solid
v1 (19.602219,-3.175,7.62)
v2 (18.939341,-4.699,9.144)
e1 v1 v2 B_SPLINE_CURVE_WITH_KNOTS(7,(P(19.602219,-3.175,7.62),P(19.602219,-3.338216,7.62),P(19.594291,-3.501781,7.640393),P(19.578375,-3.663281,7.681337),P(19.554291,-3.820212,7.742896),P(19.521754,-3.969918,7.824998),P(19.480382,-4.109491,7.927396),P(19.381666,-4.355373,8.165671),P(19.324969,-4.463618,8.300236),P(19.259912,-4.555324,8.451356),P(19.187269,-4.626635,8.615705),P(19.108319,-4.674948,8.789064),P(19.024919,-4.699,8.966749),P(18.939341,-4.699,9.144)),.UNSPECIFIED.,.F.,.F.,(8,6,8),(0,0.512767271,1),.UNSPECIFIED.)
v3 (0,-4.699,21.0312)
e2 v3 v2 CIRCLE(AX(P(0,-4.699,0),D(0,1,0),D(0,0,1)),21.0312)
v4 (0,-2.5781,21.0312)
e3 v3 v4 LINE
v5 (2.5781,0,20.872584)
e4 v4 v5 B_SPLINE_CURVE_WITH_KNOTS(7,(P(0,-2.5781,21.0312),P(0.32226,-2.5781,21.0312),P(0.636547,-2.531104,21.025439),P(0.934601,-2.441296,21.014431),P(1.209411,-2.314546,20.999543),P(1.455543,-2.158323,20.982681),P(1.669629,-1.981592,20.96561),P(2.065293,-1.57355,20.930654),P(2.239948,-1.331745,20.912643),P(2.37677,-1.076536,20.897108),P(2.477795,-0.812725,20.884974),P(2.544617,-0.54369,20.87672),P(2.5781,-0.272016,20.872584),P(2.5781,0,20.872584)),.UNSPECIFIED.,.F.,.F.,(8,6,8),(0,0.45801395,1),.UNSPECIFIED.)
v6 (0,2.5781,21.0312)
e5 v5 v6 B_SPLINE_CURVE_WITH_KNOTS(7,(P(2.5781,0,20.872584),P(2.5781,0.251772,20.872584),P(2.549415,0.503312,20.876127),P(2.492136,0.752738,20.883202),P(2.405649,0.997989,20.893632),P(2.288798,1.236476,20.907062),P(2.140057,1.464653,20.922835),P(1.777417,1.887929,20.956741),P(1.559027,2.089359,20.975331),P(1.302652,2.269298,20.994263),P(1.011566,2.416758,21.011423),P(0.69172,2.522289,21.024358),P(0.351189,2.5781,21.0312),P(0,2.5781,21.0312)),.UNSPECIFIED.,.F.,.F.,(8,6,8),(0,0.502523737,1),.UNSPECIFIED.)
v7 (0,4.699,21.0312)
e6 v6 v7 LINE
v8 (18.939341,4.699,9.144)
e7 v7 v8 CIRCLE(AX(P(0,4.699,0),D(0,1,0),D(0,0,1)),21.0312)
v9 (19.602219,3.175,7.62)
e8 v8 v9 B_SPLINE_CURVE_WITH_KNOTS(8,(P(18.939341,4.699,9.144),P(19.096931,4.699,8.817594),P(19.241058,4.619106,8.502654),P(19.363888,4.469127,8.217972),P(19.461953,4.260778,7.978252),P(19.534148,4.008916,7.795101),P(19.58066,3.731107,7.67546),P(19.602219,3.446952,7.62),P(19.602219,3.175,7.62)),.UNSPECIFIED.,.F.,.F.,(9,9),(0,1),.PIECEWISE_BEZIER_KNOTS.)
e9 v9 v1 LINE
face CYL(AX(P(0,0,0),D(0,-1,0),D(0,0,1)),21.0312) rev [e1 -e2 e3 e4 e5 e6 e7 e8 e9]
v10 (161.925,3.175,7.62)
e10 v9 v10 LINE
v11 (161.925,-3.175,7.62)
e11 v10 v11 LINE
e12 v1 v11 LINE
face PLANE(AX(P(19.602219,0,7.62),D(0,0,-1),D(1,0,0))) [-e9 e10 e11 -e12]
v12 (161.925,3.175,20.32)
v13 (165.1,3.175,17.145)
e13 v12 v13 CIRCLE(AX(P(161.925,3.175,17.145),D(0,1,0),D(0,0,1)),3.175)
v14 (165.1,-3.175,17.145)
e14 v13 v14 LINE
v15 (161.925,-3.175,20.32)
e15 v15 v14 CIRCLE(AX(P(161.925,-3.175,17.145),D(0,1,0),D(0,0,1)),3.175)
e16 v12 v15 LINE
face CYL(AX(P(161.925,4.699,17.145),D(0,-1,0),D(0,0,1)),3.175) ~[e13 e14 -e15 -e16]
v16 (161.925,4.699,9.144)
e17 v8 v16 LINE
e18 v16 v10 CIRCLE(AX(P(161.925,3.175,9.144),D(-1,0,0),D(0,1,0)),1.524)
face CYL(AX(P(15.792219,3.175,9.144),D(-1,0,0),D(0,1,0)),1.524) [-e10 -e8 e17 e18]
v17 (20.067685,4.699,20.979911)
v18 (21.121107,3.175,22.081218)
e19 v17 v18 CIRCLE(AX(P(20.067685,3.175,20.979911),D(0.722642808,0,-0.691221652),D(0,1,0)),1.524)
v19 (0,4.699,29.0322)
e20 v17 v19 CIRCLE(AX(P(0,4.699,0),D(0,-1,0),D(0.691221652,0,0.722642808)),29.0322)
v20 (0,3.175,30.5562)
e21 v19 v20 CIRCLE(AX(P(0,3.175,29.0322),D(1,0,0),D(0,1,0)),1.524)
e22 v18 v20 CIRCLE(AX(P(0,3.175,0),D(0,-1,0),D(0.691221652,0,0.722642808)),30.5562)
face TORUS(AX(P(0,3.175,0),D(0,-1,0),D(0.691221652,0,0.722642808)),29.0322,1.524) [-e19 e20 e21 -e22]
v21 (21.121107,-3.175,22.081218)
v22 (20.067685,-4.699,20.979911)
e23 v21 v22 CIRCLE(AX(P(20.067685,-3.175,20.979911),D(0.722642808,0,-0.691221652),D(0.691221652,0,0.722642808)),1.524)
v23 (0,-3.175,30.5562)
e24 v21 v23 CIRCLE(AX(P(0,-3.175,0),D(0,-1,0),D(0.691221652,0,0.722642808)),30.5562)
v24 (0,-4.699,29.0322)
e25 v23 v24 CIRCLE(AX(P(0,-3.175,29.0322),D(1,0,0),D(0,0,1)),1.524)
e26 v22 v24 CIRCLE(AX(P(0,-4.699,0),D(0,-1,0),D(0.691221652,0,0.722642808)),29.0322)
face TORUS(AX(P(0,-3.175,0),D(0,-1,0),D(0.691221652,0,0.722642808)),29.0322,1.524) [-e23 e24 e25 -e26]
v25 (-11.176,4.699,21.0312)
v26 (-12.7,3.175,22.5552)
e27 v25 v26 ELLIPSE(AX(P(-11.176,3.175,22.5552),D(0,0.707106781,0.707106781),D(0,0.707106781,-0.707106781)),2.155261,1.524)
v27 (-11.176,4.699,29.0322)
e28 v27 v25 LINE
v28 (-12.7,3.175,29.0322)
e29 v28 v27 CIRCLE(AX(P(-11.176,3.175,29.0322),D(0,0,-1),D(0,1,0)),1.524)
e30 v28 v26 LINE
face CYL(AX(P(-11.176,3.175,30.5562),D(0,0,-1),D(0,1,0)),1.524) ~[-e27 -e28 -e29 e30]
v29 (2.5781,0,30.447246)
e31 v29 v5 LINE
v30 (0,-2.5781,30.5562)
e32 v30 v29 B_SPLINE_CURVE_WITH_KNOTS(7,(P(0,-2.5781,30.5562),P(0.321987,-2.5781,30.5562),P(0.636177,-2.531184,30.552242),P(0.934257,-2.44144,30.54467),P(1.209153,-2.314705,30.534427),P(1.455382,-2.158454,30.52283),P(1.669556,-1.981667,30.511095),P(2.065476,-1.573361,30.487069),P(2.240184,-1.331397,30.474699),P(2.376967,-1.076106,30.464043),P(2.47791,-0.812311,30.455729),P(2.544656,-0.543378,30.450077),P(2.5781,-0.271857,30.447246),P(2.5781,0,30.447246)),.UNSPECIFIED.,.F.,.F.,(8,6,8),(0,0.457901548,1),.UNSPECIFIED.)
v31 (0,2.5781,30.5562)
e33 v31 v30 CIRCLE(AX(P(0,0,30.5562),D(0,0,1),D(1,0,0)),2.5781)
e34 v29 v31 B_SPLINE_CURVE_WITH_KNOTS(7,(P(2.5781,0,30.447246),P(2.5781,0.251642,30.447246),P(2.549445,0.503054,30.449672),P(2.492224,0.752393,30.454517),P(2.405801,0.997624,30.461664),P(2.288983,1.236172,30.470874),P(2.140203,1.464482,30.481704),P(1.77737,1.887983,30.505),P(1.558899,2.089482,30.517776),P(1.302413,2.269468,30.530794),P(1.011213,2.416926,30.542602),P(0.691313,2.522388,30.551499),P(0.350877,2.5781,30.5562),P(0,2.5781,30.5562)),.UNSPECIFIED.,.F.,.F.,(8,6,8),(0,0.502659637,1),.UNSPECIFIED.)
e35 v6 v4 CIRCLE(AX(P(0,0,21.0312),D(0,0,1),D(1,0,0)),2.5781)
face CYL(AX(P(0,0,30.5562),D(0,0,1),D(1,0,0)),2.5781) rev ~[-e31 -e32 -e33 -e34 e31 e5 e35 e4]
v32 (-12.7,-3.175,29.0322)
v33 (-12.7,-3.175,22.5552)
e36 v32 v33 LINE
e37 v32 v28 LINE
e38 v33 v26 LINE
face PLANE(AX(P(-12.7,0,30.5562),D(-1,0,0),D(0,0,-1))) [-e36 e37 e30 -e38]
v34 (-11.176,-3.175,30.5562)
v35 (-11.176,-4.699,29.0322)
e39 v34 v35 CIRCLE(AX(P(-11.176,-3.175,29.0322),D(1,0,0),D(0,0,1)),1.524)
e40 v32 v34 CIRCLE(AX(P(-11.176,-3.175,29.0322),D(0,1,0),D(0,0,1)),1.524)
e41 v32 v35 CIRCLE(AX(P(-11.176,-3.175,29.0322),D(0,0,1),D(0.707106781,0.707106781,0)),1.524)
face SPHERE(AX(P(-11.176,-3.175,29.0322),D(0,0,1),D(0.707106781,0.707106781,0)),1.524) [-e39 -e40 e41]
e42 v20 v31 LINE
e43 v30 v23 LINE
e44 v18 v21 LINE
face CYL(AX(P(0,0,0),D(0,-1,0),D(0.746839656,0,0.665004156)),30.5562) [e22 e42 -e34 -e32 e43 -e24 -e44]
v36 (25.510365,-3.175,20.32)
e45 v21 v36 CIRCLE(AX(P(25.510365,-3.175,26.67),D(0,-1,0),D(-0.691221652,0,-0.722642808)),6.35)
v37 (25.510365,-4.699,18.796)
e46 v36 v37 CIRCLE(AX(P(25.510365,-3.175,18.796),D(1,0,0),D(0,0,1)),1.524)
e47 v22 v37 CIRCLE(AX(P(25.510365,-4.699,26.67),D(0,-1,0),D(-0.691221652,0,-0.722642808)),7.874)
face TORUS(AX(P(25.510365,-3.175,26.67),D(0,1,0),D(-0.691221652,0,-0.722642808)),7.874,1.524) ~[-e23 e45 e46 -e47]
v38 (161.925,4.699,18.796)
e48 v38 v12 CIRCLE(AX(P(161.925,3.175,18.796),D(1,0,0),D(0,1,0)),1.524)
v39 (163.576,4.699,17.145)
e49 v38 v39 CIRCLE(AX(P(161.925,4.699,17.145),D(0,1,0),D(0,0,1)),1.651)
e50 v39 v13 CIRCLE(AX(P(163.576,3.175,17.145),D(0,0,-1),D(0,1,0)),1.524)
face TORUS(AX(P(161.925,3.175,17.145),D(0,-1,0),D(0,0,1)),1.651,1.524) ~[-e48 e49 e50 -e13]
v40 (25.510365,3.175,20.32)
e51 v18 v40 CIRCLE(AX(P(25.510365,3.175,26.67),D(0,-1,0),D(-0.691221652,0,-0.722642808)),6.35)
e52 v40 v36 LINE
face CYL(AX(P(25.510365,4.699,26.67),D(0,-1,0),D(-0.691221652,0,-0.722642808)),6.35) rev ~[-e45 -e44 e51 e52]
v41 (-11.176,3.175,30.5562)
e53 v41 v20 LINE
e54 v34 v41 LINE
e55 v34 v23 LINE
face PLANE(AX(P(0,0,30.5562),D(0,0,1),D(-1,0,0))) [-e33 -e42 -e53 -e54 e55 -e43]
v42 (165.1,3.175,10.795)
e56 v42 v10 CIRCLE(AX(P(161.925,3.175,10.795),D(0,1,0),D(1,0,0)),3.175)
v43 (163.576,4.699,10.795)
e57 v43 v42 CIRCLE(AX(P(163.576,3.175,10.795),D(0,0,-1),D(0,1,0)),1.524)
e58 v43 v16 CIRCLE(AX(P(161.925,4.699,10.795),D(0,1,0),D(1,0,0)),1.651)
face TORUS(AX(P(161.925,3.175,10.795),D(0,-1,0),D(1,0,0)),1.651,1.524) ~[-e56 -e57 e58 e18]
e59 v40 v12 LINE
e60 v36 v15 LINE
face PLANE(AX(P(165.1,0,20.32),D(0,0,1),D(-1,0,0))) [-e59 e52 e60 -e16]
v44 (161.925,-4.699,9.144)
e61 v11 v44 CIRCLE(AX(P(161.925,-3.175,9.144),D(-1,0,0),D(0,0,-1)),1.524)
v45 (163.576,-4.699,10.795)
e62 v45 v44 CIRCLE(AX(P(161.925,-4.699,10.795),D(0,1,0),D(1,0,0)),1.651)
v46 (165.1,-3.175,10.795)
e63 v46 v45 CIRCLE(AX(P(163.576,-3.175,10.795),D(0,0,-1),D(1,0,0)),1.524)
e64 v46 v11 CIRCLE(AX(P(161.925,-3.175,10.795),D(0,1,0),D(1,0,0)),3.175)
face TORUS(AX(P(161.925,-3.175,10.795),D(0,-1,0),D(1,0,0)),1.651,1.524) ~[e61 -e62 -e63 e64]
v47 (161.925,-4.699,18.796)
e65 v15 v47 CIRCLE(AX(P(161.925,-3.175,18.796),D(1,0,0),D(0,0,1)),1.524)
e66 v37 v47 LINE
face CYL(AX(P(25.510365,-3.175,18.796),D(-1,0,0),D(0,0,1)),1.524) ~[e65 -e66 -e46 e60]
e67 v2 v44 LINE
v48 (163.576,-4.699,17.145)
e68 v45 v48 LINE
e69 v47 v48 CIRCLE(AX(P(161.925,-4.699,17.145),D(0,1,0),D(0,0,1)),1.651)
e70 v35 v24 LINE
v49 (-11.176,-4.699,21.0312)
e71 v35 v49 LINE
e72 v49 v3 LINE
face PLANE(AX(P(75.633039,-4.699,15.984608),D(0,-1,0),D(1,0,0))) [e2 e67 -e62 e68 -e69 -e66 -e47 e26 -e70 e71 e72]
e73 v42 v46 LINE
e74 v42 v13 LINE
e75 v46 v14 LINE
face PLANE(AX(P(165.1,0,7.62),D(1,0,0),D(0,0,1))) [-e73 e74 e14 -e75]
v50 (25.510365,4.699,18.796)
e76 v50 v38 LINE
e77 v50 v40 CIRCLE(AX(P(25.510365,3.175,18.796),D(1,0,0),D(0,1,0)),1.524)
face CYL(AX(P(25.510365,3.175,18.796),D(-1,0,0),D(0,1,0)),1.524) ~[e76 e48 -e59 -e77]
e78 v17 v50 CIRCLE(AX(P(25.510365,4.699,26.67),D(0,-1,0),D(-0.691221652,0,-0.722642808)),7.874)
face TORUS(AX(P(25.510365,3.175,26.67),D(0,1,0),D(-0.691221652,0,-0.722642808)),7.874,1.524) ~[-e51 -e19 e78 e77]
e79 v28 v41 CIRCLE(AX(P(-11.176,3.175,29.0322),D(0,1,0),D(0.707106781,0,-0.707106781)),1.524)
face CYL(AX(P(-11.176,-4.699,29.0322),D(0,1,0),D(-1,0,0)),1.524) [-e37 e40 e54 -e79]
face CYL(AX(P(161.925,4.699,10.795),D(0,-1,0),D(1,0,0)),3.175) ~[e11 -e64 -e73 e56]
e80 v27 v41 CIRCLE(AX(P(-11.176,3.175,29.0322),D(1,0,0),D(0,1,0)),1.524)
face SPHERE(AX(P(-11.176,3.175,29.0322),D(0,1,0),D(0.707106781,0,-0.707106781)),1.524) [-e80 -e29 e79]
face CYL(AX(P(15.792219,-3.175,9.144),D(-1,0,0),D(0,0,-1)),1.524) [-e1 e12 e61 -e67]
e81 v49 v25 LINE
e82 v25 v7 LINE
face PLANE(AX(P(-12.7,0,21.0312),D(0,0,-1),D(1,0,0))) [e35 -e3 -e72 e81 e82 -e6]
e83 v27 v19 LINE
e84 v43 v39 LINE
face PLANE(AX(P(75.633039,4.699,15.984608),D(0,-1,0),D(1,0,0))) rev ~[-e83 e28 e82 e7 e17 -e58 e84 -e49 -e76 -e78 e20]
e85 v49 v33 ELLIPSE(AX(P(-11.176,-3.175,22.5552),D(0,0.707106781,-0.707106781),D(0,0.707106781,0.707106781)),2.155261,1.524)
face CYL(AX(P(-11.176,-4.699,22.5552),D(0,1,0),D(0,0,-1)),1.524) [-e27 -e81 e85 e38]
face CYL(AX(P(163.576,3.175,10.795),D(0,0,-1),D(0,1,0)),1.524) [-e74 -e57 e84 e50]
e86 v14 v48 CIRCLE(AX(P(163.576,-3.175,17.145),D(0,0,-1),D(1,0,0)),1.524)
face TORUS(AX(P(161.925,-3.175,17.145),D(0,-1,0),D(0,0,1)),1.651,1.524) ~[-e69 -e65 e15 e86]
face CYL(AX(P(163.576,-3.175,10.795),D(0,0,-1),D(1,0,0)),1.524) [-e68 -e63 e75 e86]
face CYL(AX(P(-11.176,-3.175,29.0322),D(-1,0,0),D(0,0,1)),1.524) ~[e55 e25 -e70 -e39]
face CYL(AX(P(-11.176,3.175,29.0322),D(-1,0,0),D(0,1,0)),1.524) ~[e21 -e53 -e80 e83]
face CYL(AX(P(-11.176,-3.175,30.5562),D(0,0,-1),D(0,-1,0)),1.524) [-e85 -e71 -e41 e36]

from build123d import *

# Parameters (mm, degrees)
F1_DEPTH     = 4.699
F2_R         = 3.175
F3_R         = 1.524
F4_R         = 6.35
F5_T1_DEPTH  = 11.176
F5_T3_DEPTH  = 136.4146354703
F5_T5_DEPTH  = 6.35
F5_T7_DEPTH  = 146.1327814154
F5_S11_W     = 1.524
F5_S11_H     = 1.524
F5_T12_DEPTH = 1.524
F5_S17_W     = 1.524
F5_S17_H     = 1.524
F5_T18_DEPTH = 1.524
F5_T22_ANGLE = 43.7268911646
F5_T24_ANGLE = 43.7268911646
F5_T26_ANGLE = 90
F5_T28_ANGLE = 90
F5_T30_ANGLE = 43.7268911646
F5_T32_ANGLE = 43.7268911646
F5_T34_ANGLE = 90
F5_T36_ANGLE = 90
F6_R         = 2.5781
F7_DEPTH     = 22.9372001


# Not quite as in the source:
# - a fillet or chamfer that OpenCascade refuses, or shapes differently, is made with other operations: its cross-section is extruded or revolved along the edge and cut away or added


with BuildPart() as f1:
    # F0 (on Front) → F1 (new body, symmetric)
    with BuildSketch(Plane.XZ):
        with BuildLine():
            ThreePointArc((0, 21.0312), (11.8754711368, 17.3575504816), (19.6022185846, 7.62))
            Line((19.6022185846, 7.62), (165.1, 7.62))
            Line((165.1, 7.62), (165.1, 20.32))
            Line((165.1, 20.32), (22.8205819041, 20.32))
            ThreePointArc((22.8205819041, 20.32), (12.5055862406, 27.879951062), (0, 30.5562))
            Line((0, 30.5562), (-12.7, 30.5562))
            Line((-12.7, 30.5562), (-12.7, 21.0312))
            Line((-12.7, 21.0312), (0, 21.0312))
        make_face()
    extrude(amount=F1_DEPTH, both=True)

    # F2
    f2_edges = [f1.edges().sort_by_distance(p)[0] for p in [
        (165.1, 0, 20.32),
        (165.1, 0, 7.62),
    ]]
    fillet(f2_edges, radius=F2_R)

    # F3
    f3_edges = [f1.edges().sort_by_distance(p)[0] for p in [
        (-12.7, 4.699, 25.7937),
        (-12.7, 0, 21.0312),
        (-12.7, -4.699, 25.7937),
        (-12.7, 0, 30.5562),
    ]]
    fillet(f3_edges, radius=F3_R)

    # F4
    f4_edges = [f1.edges().sort_by_distance(p)[0] for p in [
        (22.820582, 0, 20.32),
    ]]
    fillet(f4_edges, radius=F4_R)

    # F5: fillet of radius 1.524 on 2 edges, made by hand

    # F5_s2 → F5_t1 (cut)
    with BuildSketch(Plane.YZ.offset(-11.176)):
        with BuildLine():
            ThreePointArc((-3.175, 30.5562), (-4.2526307345, 30.1098307345), (-4.699, 29.0322))
            Line((-4.699, 29.0322), (-4.699, 30.5562))
            Line((-4.699, 30.5562), (-3.175, 30.5562))
        make_face()
        with BuildLine():
            ThreePointArc((4.699, 29.0322), (4.2526307345, 30.1098307345), (3.175, 30.5562))
            Line((3.175, 30.5562), (4.699, 30.5562))
            Line((4.699, 30.5562), (4.699, 29.0322))
        make_face()
    extrude(amount=F5_T1_DEPTH, mode=Mode.SUBTRACT)

    # F5_s4 → F5_t3 (cut)
    with BuildSketch(Plane.YZ.offset(25.5103645297)):
        with BuildLine():
            ThreePointArc((4.699, 18.796), (4.2526307345, 19.8736307345), (3.175, 20.32))
            Line((3.175, 20.32), (4.699, 20.32))
            Line((4.699, 20.32), (4.699, 18.796))
        make_face()
        with BuildLine():
            ThreePointArc((-3.175, 20.32), (-4.2526307345, 19.8736307345), (-4.699, 18.796))
            Line((-4.699, 18.796), (-4.699, 20.32))
            Line((-4.699, 20.32), (-3.175, 20.32))
        make_face()
    extrude(amount=F5_T3_DEPTH, mode=Mode.SUBTRACT)

    # F5_s6 → F5_t5 (cut)
    with BuildSketch(Plane.XY.offset(10.795)):
        with BuildLine():
            ThreePointArc((163.576, 4.699), (164.6536307345, 4.2526307345), (165.1, 3.175))
            Line((165.1, 3.175), (165.1, 4.699))
            Line((165.1, 4.699), (163.576, 4.699))
        make_face()
        with BuildLine():
            ThreePointArc((165.1, -3.175), (164.6536307345, -4.2526307345), (163.576, -4.699))
            Line((163.576, -4.699), (165.1, -4.699))
            Line((165.1, -4.699), (165.1, -3.175))
        make_face()
    extrude(amount=F5_T5_DEPTH, mode=Mode.SUBTRACT)

    # F5_s8 → F5_t7 (cut)
    with BuildSketch(Plane.YZ.offset(15.7922185846)):
        with BuildLine():
            ThreePointArc((4.699, 9.144), (4.2526307345, 8.0663692655), (3.175, 7.62))
            Line((3.175, 7.62), (4.699, 7.62))
            Line((4.699, 7.62), (4.699, 9.144))
        make_face()
        with BuildLine():
            ThreePointArc((-3.175, 7.62), (-4.2526307345, 8.0663692655), (-4.699, 9.144))
            Line((-4.699, 9.144), (-4.699, 7.62))
            Line((-4.699, 7.62), (-3.175, 7.62))
        make_face()
    extrude(amount=F5_T7_DEPTH, mode=Mode.SUBTRACT)


with BuildPart() as f5_tool10:
    # F5_s11 → F5_t12 (new body)
    with BuildSketch(Plane.XZ.offset(-3.175)):
        with Locations((-11.938, 29.7942)):
            Rectangle(F5_S11_W, F5_S11_H)
    extrude(amount=-F5_T12_DEPTH)

    # F5_s13 → F5_t14 (revolve, cut)
    with BuildSketch(Plane(origin=(-11.176, 3.175, 29.0322), x_dir=(0.7071067812, 0, -0.7071067812), z_dir=(0.7071067812, 0, 0.7071067812))):
        with BuildLine():
            ThreePointArc((0, -1.524), (1.524, 0), (0, 1.524))
            Line((0, 1.524), (0, -1.524))
        make_face()
    revolve(axis=Axis((-11.176, 3.175, 29.0322), (0, 1, 0)), mode=Mode.SUBTRACT)


with BuildPart() as f1_1:
    add(f1.part)

    # F5_t9: cut F5_tool10
    add(f5_tool10.part, mode=Mode.SUBTRACT)


with BuildPart() as f5_tool16:
    # F5_s17 → F5_t18 (new body)
    with BuildSketch(Plane.XY.offset(29.0322)):
        with Locations((-11.938, -3.937)):
            Rectangle(F5_S17_W, F5_S17_H)
    extrude(amount=F5_T18_DEPTH)

    # F5_s19 → F5_t20 (revolve, cut)
    with BuildSketch(Plane(origin=(-11.176, -3.175, 29.0322), x_dir=(0.7071067812, 0.7071067812, 0), z_dir=(0.7071067812, -0.7071067812, 0))):
        with BuildLine():
            ThreePointArc((0, -1.524), (1.524, 0), (0, 1.524))
            Line((0, 1.524), (0, -1.524))
        make_face()
    revolve(axis=Axis((-11.176, -3.175, 29.0322), (0, 0, 1)), mode=Mode.SUBTRACT)


with BuildPart() as f1_2:
    add(f1_1.part)

    # F5_t15: cut F5_tool16
    add(f5_tool16.part, mode=Mode.SUBTRACT)

    # F5_s21 → F5_t22 (revolve, cut)
    with BuildSketch(Plane(origin=(0, 0, 0), x_dir=(0, 1, 0), z_dir=(0.722642808, 0, -0.6912216519))):
        with BuildLine():
            ThreePointArc((4.699, 29.0322), (4.2526307345, 30.1098307345), (3.175, 30.5562))
            Line((3.175, 30.5562), (4.699, 30.5562))
            Line((4.699, 30.5562), (4.699, 29.0322))
        make_face()
    revolve(axis=Axis((0, 4.699, 0), (0, -1, 0)), revolution_arc=F5_T22_ANGLE, mode=Mode.SUBTRACT)

    # F5_s23 → F5_t24 (revolve, cut)
    with BuildSketch(Plane(origin=(0, 0, 0), x_dir=(0, 1, 0), z_dir=(-0.722642808, 0, 0.6912216519))):
        with BuildLine():
            ThreePointArc((4.699, -29.0322), (4.2526307345, -30.1098307345), (3.175, -30.5562))
            Line((3.175, -30.5562), (4.699, -30.5562))
            Line((4.699, -30.5562), (4.699, -29.0322))
        make_face()
    revolve(axis=Axis((25.5103645297, 4.699, 26.67), (0, -1, 0)), revolution_arc=F5_T24_ANGLE, mode=Mode.SUBTRACT)

    # F5_s25 → F5_t26 (revolve, cut)
    with BuildSketch(Plane.YZ.offset(161.925)):
        with BuildLine():
            ThreePointArc((4.699, 18.796), (4.2526307345, 19.8736307345), (3.175, 20.32))
            Line((3.175, 20.32), (4.699, 20.32))
            Line((4.699, 20.32), (4.699, 18.796))
        make_face()
    revolve(axis=Axis((161.925, 4.699, 17.145), (0, 1, 0)), revolution_arc=F5_T26_ANGLE, mode=Mode.SUBTRACT)

    # F5_s27 → F5_t28 (revolve, cut)
    with BuildSketch(Plane.XY.offset(10.795)):
        with BuildLine():
            ThreePointArc((163.576, 4.699), (164.6536307345, 4.2526307345), (165.1, 3.175))
            Line((165.1, 3.175), (165.1, 4.699))
            Line((165.1, 4.699), (163.576, 4.699))
        make_face()
    revolve(axis=Axis((161.925, 4.699, 10.795), (0, 1, 0)), revolution_arc=F5_T28_ANGLE, mode=Mode.SUBTRACT)

    # F5_s29 → F5_t30 (revolve, cut)
    with BuildSketch(Plane(origin=(0, 0, 0), x_dir=(0, 1, 0), z_dir=(0.722642808, 0, -0.6912216519))):
        with BuildLine():
            ThreePointArc((-3.175, 30.5562), (-4.2526307345, 30.1098307345), (-4.699, 29.0322))
            Line((-4.699, 29.0322), (-4.699, 30.5562))
            Line((-4.699, 30.5562), (-3.175, 30.5562))
        make_face()
    revolve(axis=Axis((0, -4.699, 0), (0, -1, 0)), revolution_arc=F5_T30_ANGLE, mode=Mode.SUBTRACT)

    # F5_s31 → F5_t32 (revolve, cut)
    with BuildSketch(Plane(origin=(0, 0, 0), x_dir=(0, 1, 0), z_dir=(-0.722642808, 0, 0.6912216519))):
        with BuildLine():
            ThreePointArc((-3.175, -30.5562), (-4.2526307345, -30.1098307345), (-4.699, -29.0322))
            Line((-4.699, -29.0322), (-4.699, -30.5562))
            Line((-4.699, -30.5562), (-3.175, -30.5562))
        make_face()
    revolve(axis=Axis((25.5103645297, -4.699, 26.67), (0, -1, 0)), revolution_arc=F5_T32_ANGLE, mode=Mode.SUBTRACT)

    # F5_s33 → F5_t34 (revolve, cut)
    with BuildSketch(Plane.YZ.offset(161.925)):
        with BuildLine():
            ThreePointArc((-3.175, 20.32), (-4.2526307345, 19.8736307345), (-4.699, 18.796))
            Line((-4.699, 18.796), (-4.699, 20.32))
            Line((-4.699, 20.32), (-3.175, 20.32))
        make_face()
    revolve(axis=Axis((161.925, -4.699, 17.145), (0, 1, 0)), revolution_arc=F5_T34_ANGLE, mode=Mode.SUBTRACT)

    # F5_s35 → F5_t36 (revolve, cut)
    with BuildSketch(Plane.XY.offset(10.795)):
        with BuildLine():
            ThreePointArc((165.1, -3.175), (164.6536307345, -4.2526307345), (163.576, -4.699))
            Line((163.576, -4.699), (165.1, -4.699))
            Line((165.1, -4.699), (165.1, -3.175))
        make_face()
    revolve(axis=Axis((161.925, -4.699, 10.795), (0, 1, 0)), revolution_arc=F5_T36_ANGLE, mode=Mode.SUBTRACT)

    # F6 (on face) → F7 (cut, through all)
    with BuildSketch(Plane.XY.offset(30.5562)):
        Circle(F6_R)
    extrude(amount=-F7_DEPTH, mode=Mode.SUBTRACT)


solid = f1_2.part
